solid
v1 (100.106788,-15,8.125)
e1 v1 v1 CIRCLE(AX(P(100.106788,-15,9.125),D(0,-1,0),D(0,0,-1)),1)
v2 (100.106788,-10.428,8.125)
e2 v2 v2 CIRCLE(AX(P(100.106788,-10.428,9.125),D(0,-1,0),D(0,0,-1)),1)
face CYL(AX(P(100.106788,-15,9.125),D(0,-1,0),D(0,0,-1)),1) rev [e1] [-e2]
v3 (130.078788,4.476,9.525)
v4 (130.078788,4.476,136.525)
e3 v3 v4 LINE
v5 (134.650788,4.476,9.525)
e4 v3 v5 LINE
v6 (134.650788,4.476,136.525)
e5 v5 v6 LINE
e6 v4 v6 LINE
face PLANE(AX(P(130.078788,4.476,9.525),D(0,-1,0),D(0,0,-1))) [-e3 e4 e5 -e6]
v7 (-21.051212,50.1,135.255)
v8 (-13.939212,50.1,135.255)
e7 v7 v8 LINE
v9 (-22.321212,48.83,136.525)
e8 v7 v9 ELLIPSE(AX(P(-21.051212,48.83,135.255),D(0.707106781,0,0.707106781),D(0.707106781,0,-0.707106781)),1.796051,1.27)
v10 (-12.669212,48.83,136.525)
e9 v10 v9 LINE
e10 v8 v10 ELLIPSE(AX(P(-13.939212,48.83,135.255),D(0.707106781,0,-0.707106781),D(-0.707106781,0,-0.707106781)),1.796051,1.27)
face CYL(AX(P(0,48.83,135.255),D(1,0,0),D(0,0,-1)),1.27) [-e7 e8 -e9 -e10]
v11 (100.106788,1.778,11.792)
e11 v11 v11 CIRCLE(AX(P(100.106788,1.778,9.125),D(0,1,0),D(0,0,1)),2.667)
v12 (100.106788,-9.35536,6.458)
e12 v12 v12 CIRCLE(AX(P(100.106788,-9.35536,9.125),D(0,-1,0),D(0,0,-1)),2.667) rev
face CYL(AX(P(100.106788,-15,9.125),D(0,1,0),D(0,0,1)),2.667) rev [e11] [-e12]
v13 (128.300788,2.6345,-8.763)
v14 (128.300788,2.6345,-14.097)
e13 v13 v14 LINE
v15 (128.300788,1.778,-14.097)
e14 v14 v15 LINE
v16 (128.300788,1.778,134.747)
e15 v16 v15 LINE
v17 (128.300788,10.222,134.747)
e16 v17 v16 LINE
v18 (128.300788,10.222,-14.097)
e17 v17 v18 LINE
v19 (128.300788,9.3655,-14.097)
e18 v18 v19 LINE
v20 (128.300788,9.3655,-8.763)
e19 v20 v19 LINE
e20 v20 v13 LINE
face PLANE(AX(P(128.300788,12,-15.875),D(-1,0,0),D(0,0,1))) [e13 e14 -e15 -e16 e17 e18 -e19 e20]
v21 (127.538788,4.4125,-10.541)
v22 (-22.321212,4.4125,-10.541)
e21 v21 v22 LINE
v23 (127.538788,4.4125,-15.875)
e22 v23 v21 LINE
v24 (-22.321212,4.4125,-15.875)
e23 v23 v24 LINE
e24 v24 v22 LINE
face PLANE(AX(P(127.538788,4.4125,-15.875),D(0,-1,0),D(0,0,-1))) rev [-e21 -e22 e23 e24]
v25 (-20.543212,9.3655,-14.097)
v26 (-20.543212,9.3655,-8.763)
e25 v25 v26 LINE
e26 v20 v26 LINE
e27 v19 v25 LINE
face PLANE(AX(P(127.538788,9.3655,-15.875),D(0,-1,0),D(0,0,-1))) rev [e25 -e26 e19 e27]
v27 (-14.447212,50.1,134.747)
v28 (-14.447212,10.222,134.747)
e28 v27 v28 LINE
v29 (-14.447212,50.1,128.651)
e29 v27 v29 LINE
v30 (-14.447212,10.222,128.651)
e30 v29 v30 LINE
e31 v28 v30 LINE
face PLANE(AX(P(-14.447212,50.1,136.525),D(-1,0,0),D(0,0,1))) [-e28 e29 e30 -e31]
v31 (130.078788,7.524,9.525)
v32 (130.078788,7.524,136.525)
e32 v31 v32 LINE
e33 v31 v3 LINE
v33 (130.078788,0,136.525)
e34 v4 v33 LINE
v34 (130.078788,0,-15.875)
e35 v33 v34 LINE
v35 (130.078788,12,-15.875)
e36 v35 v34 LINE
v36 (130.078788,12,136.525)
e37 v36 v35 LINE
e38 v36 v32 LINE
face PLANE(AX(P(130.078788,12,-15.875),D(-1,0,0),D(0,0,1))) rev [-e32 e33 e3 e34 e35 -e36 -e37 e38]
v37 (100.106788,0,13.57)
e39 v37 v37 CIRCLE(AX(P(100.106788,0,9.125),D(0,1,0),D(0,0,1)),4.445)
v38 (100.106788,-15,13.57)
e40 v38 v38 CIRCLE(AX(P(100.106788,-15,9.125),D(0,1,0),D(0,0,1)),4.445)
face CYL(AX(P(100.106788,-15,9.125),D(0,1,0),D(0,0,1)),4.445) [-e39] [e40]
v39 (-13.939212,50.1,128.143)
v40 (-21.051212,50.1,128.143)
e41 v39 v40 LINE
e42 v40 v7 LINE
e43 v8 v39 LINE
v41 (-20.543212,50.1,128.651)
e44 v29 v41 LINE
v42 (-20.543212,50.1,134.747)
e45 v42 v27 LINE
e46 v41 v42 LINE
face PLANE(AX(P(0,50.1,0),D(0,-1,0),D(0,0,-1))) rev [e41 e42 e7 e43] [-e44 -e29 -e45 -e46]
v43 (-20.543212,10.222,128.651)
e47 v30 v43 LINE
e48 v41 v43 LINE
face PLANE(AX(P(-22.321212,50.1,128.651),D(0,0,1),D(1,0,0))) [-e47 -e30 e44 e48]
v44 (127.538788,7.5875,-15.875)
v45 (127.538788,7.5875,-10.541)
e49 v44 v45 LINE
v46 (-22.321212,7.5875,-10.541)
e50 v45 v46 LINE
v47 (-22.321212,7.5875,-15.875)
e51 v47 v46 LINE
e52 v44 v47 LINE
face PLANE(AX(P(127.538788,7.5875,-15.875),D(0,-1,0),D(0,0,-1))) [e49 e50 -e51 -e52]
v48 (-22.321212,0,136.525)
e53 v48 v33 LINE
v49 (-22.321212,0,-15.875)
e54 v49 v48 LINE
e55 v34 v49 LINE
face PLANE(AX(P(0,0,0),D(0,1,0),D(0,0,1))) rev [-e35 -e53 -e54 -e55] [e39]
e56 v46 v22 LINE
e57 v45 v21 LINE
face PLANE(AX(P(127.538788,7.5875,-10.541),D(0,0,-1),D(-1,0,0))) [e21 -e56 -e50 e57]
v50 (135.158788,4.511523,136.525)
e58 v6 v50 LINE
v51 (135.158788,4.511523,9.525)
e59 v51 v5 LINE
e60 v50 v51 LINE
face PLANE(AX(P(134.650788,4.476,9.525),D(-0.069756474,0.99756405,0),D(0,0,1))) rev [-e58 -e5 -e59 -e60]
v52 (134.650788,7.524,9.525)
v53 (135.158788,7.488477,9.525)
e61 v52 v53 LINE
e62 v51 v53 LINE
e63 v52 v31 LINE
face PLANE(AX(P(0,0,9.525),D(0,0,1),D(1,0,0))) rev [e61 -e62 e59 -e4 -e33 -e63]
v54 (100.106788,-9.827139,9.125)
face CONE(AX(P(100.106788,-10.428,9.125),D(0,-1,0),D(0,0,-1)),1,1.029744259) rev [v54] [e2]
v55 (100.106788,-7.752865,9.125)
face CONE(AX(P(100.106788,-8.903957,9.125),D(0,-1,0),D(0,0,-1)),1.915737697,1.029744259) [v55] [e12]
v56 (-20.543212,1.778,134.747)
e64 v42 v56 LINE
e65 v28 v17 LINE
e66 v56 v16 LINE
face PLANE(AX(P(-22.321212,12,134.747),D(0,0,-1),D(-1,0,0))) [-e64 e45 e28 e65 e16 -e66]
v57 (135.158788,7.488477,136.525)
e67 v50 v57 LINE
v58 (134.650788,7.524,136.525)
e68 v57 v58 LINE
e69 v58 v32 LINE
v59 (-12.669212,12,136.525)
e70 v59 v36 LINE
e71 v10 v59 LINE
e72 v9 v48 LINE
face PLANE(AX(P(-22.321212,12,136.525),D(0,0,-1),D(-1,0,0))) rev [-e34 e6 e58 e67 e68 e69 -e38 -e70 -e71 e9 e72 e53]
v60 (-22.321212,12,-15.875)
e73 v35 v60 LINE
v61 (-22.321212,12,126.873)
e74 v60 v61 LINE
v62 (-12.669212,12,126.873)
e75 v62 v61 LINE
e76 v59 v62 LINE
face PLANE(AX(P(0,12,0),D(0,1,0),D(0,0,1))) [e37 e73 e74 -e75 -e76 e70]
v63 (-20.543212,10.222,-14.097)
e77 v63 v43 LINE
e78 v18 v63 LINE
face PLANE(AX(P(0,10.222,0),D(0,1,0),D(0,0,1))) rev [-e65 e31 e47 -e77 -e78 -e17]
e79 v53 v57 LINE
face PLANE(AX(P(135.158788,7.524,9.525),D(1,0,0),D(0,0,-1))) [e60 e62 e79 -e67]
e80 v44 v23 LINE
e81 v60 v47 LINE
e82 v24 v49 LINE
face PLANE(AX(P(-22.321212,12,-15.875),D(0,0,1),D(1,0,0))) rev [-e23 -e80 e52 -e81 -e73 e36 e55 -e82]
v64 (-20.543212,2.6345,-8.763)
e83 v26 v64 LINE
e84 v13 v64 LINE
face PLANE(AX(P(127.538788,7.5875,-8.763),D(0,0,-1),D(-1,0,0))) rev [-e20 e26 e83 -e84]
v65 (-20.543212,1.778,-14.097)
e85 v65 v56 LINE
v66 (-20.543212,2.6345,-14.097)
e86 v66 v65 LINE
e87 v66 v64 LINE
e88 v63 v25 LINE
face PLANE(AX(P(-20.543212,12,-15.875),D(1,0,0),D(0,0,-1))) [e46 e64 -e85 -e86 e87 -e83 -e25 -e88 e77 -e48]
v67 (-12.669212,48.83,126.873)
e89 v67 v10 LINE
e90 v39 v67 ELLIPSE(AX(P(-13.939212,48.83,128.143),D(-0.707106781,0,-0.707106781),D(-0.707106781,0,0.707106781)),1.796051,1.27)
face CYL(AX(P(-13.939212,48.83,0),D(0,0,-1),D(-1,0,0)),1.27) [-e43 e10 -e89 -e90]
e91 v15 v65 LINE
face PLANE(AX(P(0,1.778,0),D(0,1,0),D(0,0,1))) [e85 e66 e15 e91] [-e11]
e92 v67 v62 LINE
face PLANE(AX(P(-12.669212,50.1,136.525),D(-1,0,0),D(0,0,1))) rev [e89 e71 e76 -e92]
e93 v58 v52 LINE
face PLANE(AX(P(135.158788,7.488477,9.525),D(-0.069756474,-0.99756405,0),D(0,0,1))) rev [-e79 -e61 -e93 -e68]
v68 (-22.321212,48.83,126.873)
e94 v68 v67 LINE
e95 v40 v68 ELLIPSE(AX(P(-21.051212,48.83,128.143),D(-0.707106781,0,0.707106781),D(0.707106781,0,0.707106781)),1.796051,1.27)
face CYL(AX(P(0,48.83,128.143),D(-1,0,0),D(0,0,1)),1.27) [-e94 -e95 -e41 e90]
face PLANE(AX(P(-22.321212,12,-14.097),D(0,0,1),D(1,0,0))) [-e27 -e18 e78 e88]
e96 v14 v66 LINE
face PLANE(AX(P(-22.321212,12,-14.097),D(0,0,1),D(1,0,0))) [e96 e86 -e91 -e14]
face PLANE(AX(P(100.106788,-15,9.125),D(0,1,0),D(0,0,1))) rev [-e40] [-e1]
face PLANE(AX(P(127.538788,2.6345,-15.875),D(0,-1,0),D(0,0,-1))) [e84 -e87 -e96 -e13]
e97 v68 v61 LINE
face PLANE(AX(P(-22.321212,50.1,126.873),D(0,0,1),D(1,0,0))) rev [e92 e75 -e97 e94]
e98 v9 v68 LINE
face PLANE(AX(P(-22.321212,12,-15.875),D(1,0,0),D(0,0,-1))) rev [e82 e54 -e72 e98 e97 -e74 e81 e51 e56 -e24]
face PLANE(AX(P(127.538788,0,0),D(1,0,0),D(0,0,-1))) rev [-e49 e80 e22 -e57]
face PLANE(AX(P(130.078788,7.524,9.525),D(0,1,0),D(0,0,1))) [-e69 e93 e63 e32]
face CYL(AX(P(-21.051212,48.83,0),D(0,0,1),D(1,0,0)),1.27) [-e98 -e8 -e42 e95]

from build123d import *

# Parameters (mm, degrees)
SKETCH1_W                 = 152.4
SKETCH1_H                 = 152.4
BOSS_EXTRUDE2_DEPTH       = 12
SKETCH2_W                 = 9.652
SKETCH2_H                 = 9.652
BOSS_EXTRUDE3_DEPTH       = 38.1
SKETCH3_W                 = 5.08
SKETCH3_H                 = 3.048
BOSS_EXTRUDE4_DEPTH       = 127
CHAMFER1_SIZE             = 0.508
CHAMFER1_SIZE2            = 0.03552282
CHAMFER2_SIZE             = 0.508
CHAMFER2_SIZE2            = 0.03552282
SKETCH4_W                 = 5.334
SKETCH4_H                 = 3.175
CUT_EXTRUDE3_DEPTH        = 149.86
SKETCH5_R                 = 4.445
BOSS_EXTRUDE5_DEPTH       = 15
F_2_0MM_DOWEL_HOLE1_D     = 2
F_2_0MM_DOWEL_HOLE1_DEPTH = 4.572
F_2_0MM_DOWEL_HOLE1_TIP   = 0.600860619
SHELL1_START              = 1.778
SHELL1_OUTLINE_W          = 148.844
SHELL1_OUTLINE_H          = 143.51
SHELL1_DEPTH              = 8.444
SHELL1_START_2            = 10.222
SHELL1_2_OUTLINE_W        = 6.096
SHELL1_2_OUTLINE_H        = 6.096
SHELL1_2_DEPTH            = 39.878
SHELL1_3_OUTLINE_W        = 148.844
SHELL1_3_OUTLINE_H        = 5.334
SHELL1_3_DEPTH            = 0.8565
SHELL1_START_3            = 9.3655
SHELL1_4_OUTLINE_W        = 148.844
SHELL1_4_OUTLINE_H        = 5.334
SHELL1_4_DEPTH            = 0.8565
SHELL1_START_4            = -7.752865101
SHELL1_5_OUTLINE_R        = 2.667
SHELL1_5_DEPTH            = 9.530865101
FILLET1_R                 = 1.27


with BuildPart() as part:
    # Sketch1 → Boss-Extrude2 (new body)
    with BuildSketch(Plane(origin=(0, 0, 0), x_dir=(1, 0, 0), z_dir=(0, 1, 0))):
        with Locations((53.878787879, -60.325)):
            Rectangle(SKETCH1_W, SKETCH1_H)
    extrude(amount=BOSS_EXTRUDE2_DEPTH)

    # Sketch2 → Boss-Extrude3 (add)
    with BuildSketch(Plane(origin=(0, 12, 0), x_dir=(1, 0, 0), z_dir=(0, 1, 0))):
        with Locations((-17.495212121, -131.699)):
            Rectangle(SKETCH2_W, SKETCH2_H)
    extrude(amount=BOSS_EXTRUDE3_DEPTH)

    # Sketch3 → Boss-Extrude4 (add)
    with BuildSketch(Plane.XY.offset(136.525)):
        with Locations((132.618787879, 6)):
            Rectangle(SKETCH3_W, SKETCH3_H)
    extrude(amount=-BOSS_EXTRUDE4_DEPTH)

    # Chamfer1
    chamfer1_edges = [part.edges().sort_by_distance(p)[0] for p in [
        (135.158787879, 7.524, 73.025),
    ]]
    chamfer1_side = [part.faces().sort_by_distance(p)[0] for p in [
        (132.618787879, 7.524, 73.025),
    ]]
    chamfer(chamfer1_edges, length=CHAMFER1_SIZE, length2=CHAMFER1_SIZE2, reference=chamfer1_side[0])

    # Chamfer2
    chamfer2_edges = [part.edges().sort_by_distance(p)[0] for p in [
        (135.158787879, 4.476, 73.025),
    ]]
    chamfer2_side = [part.faces().sort_by_distance(p)[0] for p in [
        (132.618787879, 4.476, 73.025),
    ]]
    chamfer(chamfer2_edges, length=CHAMFER2_SIZE, length2=CHAMFER2_SIZE2, reference=chamfer2_side[0])

    # Sketch4 → Cut-Extrude3 (cut)
    with BuildSketch(Plane.ZY.offset(22.321212121)):
        with Locations((-13.208, 6)):
            Rectangle(SKETCH4_W, SKETCH4_H)
    extrude(amount=-CUT_EXTRUDE3_DEPTH, mode=Mode.SUBTRACT)

    # Sketch5 → Boss-Extrude5 (add)
    with BuildSketch(Plane(origin=(0, 0, 0), x_dir=(1, 0, 0), z_dir=(0, 1, 0))):
        with Locations(Location((100.106787879, -9.125, 0), (0, 0, 270))):
            Circle(SKETCH5_R)
    extrude(amount=-BOSS_EXTRUDE5_DEPTH)

    # Ø2.0mm Dowel Hole1
    with Locations(Plane(origin=(0, -15, 0), x_dir=(-1, 0, 0), z_dir=(0, -1, 0))):
        with Locations((-100.106787879, -9.125)):
            Hole(F_2_0MM_DOWEL_HOLE1_D / 2, depth=F_2_0MM_DOWEL_HOLE1_DEPTH)
            with Locations((0, 0, -(F_2_0MM_DOWEL_HOLE1_DEPTH + F_2_0MM_DOWEL_HOLE1_TIP / 2))):  # 118° drill point
                Cone(0, F_2_0MM_DOWEL_HOLE1_D / 2, F_2_0MM_DOWEL_HOLE1_TIP, mode=Mode.SUBTRACT)

    # Shell1: read off the stored shape, not the designer's step
    # Shell1 outline → Shell1 (cut)
    with BuildSketch(Plane(origin=(0, 0, 0), x_dir=(1, 0, 0), z_dir=(0, 1, 0)).offset(SHELL1_START)):
        with Locations((53.878787879, -62.992)):
            Rectangle(SHELL1_OUTLINE_W, SHELL1_OUTLINE_H)
    extrude(amount=SHELL1_DEPTH, mode=Mode.SUBTRACT)

    # Shell1 2 outline → Shell1 2 (cut)
    with BuildSketch(Plane(origin=(0, 0, 0), x_dir=(1, 0, 0), z_dir=(0, 1, 0)).offset(SHELL1_START_2)):
        with Locations((-17.495212121, -131.699)):
            Rectangle(SHELL1_2_OUTLINE_W, SHELL1_2_OUTLINE_H)
    extrude(amount=SHELL1_2_DEPTH, mode=Mode.SUBTRACT)

    # Shell1 3 outline → Shell1 3 (cut)
    with BuildSketch(Plane(origin=(0, 0, 0), x_dir=(1, 0, 0), z_dir=(0, 1, 0)).offset(SHELL1_START)):
        with Locations((53.878787879, 11.43)):
            Rectangle(SHELL1_3_OUTLINE_W, SHELL1_3_OUTLINE_H)
    extrude(amount=SHELL1_3_DEPTH, mode=Mode.SUBTRACT)

    # Shell1 4 outline → Shell1 4 (cut)
    with BuildSketch(Plane(origin=(0, 0, 0), x_dir=(1, 0, 0), z_dir=(0, 1, 0)).offset(SHELL1_START_3)):
        with Locations((53.878787879, 11.43)):
            Rectangle(SHELL1_4_OUTLINE_W, SHELL1_4_OUTLINE_H)
    extrude(amount=SHELL1_4_DEPTH, mode=Mode.SUBTRACT)

    # Shell1 5 outline → Shell1 5 (cut)
    with BuildSketch(Plane(origin=(0, 0, 0), x_dir=(1, 0, 0), z_dir=(0, 1, 0)).offset(SHELL1_START_4)):
        with Locations((100.106787879, -9.125)):
            Circle(SHELL1_5_OUTLINE_R)
    extrude(amount=SHELL1_5_DEPTH, mode=Mode.SUBTRACT)

    # Shell1 6 outline → Shell1 6 (revolve, cut)
    with BuildSketch(Plane(origin=(100.106787879, 0, 9.125), x_dir=(1, 0, 0), z_dir=(0, 0, 1))):
        Polygon((0, -7.752865201), (2.667, -9.355360472), (2.667, -7.752865101), align=None)
    revolve(axis=Axis((100.106787879, 0, 9.125), (0, 1, 0)), mode=Mode.SUBTRACT)

    # Fillet1
    fillet1_edges = [part.edges().sort_by_distance(p)[0] for p in [
        (-22.321212121, 50.1, 131.699),
        (-17.495212121, 50.1, 136.525),
        (-12.669212121, 50.1, 131.699),
        (-17.495212121, 50.1, 126.873),
    ]]
    fillet(fillet1_edges, radius=FILLET1_R)


solid = part.part
